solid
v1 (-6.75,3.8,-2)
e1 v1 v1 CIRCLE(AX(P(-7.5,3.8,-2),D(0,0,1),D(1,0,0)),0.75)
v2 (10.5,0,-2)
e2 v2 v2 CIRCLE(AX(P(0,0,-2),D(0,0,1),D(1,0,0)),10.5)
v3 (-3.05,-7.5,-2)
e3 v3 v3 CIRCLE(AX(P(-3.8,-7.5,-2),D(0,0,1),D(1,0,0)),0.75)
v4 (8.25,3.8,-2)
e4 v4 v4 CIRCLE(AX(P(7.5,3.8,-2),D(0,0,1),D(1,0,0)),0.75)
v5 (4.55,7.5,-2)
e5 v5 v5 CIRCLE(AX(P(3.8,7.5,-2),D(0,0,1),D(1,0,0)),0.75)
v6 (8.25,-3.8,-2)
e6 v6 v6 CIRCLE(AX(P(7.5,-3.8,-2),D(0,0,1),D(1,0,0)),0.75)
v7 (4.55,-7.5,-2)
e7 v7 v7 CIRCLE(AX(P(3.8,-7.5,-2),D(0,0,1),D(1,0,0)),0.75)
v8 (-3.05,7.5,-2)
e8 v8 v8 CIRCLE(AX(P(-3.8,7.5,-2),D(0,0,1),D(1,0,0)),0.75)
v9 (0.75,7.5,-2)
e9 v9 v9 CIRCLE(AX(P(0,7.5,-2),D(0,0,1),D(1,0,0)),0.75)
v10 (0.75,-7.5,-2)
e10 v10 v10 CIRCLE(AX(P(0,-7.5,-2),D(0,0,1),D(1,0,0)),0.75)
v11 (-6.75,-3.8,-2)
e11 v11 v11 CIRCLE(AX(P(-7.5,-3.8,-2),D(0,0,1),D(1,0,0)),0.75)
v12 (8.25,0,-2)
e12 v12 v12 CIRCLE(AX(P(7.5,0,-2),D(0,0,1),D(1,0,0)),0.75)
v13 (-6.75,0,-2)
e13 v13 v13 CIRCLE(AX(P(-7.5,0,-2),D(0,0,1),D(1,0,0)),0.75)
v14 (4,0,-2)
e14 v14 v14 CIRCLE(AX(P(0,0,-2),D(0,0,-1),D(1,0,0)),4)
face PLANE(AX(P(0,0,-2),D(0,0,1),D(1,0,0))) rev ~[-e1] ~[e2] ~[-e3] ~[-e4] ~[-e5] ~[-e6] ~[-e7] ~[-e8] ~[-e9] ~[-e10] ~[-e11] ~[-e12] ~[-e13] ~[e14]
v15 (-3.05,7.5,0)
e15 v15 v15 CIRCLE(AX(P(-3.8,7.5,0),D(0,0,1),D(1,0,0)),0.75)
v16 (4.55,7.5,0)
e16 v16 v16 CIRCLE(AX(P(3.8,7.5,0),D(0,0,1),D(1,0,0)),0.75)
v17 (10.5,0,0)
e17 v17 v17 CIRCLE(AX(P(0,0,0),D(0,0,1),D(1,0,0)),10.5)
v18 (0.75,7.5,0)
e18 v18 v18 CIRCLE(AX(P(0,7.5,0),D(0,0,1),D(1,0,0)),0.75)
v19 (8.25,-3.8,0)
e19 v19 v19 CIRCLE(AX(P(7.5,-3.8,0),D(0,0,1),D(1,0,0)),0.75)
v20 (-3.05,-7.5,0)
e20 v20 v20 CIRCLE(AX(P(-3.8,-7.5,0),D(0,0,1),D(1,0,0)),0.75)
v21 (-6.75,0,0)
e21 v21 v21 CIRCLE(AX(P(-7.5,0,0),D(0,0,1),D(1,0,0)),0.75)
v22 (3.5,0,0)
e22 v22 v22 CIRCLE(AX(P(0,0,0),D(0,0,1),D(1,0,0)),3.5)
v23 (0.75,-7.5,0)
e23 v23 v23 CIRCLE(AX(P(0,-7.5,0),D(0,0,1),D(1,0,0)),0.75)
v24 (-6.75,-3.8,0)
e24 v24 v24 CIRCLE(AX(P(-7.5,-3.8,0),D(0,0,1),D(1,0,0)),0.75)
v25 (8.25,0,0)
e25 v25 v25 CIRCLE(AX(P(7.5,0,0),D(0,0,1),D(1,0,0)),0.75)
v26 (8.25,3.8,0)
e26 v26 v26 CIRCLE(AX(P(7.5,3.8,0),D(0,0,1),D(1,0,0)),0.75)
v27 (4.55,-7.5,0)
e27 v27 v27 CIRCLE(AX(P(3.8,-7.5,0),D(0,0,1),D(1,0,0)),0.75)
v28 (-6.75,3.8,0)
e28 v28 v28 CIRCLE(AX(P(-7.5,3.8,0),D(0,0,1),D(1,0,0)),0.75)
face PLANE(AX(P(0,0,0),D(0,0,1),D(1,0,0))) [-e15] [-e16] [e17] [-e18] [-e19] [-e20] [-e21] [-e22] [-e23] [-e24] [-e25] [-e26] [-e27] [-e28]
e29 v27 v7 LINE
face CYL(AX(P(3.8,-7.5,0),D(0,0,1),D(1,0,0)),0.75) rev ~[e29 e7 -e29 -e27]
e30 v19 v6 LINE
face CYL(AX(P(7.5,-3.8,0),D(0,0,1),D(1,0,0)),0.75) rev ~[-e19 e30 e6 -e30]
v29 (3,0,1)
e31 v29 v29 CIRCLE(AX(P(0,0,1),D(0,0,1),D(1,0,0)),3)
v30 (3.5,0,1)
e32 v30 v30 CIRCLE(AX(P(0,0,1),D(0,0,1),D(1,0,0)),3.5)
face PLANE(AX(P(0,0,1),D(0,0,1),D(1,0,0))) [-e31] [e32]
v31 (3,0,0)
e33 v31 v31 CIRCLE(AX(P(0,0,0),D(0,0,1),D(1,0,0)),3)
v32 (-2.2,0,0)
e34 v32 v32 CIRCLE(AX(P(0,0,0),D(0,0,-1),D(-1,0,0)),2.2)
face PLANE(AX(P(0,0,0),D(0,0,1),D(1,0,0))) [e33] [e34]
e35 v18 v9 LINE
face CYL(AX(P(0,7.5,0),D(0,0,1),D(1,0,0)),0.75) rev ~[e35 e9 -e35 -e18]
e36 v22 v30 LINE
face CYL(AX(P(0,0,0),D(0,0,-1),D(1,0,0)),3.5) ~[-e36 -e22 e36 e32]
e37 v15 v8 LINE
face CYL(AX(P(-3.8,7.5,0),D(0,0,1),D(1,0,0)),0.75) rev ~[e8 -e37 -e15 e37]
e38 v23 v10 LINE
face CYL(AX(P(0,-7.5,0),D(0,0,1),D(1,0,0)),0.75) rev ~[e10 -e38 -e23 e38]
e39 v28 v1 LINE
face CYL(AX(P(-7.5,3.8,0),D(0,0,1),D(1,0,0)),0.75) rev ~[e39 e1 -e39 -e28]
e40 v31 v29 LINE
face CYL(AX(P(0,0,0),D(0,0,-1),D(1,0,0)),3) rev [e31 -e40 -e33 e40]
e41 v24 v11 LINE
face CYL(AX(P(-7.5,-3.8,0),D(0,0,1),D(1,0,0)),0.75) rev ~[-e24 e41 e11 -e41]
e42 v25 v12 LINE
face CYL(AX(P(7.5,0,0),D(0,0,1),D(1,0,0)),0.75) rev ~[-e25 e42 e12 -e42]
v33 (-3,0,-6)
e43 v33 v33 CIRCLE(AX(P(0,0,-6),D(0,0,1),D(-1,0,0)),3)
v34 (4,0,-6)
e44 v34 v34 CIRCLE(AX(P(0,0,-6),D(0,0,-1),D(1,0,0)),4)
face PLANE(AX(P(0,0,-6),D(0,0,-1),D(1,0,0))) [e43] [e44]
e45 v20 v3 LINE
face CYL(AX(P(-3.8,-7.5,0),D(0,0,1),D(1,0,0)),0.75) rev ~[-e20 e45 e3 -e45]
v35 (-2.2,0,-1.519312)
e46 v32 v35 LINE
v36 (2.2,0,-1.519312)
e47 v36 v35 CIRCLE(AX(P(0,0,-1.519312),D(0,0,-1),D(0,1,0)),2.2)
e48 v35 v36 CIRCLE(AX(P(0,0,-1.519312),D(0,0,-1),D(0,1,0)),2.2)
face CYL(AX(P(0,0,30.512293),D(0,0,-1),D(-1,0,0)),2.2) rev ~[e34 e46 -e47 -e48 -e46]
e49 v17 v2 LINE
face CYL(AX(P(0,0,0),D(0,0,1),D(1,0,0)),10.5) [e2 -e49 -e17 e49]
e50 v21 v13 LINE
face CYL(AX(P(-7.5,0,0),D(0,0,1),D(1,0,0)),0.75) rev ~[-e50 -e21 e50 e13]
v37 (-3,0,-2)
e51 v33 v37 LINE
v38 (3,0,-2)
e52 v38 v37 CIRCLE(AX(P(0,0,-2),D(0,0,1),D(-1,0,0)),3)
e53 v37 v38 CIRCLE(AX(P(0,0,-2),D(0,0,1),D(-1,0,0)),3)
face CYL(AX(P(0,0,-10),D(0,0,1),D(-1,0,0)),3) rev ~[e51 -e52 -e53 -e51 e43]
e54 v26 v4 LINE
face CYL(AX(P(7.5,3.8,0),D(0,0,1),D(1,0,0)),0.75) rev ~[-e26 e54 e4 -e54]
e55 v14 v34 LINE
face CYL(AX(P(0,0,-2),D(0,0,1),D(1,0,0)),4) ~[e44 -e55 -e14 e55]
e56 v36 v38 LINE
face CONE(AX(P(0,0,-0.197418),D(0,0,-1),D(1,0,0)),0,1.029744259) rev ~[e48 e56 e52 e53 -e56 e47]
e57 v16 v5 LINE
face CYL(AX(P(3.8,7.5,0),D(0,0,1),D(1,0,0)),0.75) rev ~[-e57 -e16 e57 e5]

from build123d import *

# Parameters (mm, degrees)
F0_R     = 10.5
F0_R_2   = 0.75
F0_R_3   = 3.5
F0_R_4   = 3
F1_DEPTH = 2
F2_DEPTH = 1
F3_R     = 4
F4_DEPTH = 4
F6_D     = 4.4
F8_D     = 6
F8_DEPTH = 4
F8_TIP   = 1.8025818571


with BuildPart() as f1:
    # F0 (on Top) → F1 (new body)
    with BuildSketch(Plane.XY):
        Circle(F0_R)
        with Locations((-3.8, -7.5)):
            Circle(F0_R_2, mode=Mode.SUBTRACT)
        with Locations((-7.5, -3.8)):
            Circle(F0_R_2, mode=Mode.SUBTRACT)
        with Locations((0, -7.5)):
            Circle(F0_R_2, mode=Mode.SUBTRACT)
        with Locations((3.8, -7.5)):
            Circle(F0_R_2, mode=Mode.SUBTRACT)
        with Locations((7.5, -3.8)):
            Circle(F0_R_2, mode=Mode.SUBTRACT)
        with Locations((-7.5, 0)):
            Circle(F0_R_2, mode=Mode.SUBTRACT)
        with Locations((-7.5, 3.8)):
            Circle(F0_R_2, mode=Mode.SUBTRACT)
        with Locations((-3.8, 7.5)):
            Circle(F0_R_2, mode=Mode.SUBTRACT)
        Circle(F0_R_3, mode=Mode.SUBTRACT)
        with Locations((7.5, 0)):
            Circle(F0_R_2, mode=Mode.SUBTRACT)
        with Locations((7.5, 3.8)):
            Circle(F0_R_2, mode=Mode.SUBTRACT)
        with Locations((0, 7.5)):
            Circle(F0_R_2, mode=Mode.SUBTRACT)
        with Locations((3.8, 7.5)):
            Circle(F0_R_2, mode=Mode.SUBTRACT)
        Circle(F0_R_3)
        Circle(F0_R_4, mode=Mode.SUBTRACT)
        Circle(F0_R_4)
    extrude(amount=-F1_DEPTH)

    # F0 (on Top) → F2 (join)
    with BuildSketch(Plane.XY):
        Circle(F0_R_3)
        Circle(F0_R_4, mode=Mode.SUBTRACT)
    extrude(amount=F2_DEPTH)

    # F3 (on face) → F4 (join)
    with BuildSketch(Plane(origin=(0, 0, -2), x_dir=(1, 0, 0), z_dir=(0, 0, -1))):
        Circle(F3_R)
    extrude(amount=F4_DEPTH)

    # F6 (through all)
    with Locations(Plane.XY):
        with Locations((0, 0)):
            Hole(F6_D / 2)

    # F8
    with Locations(Plane(origin=(0, 0, -6), x_dir=(1, 0, 0), z_dir=(0, 0, -1))):
        with Locations((0, 0)):
            Hole(F8_D / 2, depth=F8_DEPTH)
            with Locations((0, 0, -(F8_DEPTH + F8_TIP / 2))):  # 118° drill point
                Cone(0, F8_D / 2, F8_TIP, mode=Mode.SUBTRACT)


solid = f1.part
